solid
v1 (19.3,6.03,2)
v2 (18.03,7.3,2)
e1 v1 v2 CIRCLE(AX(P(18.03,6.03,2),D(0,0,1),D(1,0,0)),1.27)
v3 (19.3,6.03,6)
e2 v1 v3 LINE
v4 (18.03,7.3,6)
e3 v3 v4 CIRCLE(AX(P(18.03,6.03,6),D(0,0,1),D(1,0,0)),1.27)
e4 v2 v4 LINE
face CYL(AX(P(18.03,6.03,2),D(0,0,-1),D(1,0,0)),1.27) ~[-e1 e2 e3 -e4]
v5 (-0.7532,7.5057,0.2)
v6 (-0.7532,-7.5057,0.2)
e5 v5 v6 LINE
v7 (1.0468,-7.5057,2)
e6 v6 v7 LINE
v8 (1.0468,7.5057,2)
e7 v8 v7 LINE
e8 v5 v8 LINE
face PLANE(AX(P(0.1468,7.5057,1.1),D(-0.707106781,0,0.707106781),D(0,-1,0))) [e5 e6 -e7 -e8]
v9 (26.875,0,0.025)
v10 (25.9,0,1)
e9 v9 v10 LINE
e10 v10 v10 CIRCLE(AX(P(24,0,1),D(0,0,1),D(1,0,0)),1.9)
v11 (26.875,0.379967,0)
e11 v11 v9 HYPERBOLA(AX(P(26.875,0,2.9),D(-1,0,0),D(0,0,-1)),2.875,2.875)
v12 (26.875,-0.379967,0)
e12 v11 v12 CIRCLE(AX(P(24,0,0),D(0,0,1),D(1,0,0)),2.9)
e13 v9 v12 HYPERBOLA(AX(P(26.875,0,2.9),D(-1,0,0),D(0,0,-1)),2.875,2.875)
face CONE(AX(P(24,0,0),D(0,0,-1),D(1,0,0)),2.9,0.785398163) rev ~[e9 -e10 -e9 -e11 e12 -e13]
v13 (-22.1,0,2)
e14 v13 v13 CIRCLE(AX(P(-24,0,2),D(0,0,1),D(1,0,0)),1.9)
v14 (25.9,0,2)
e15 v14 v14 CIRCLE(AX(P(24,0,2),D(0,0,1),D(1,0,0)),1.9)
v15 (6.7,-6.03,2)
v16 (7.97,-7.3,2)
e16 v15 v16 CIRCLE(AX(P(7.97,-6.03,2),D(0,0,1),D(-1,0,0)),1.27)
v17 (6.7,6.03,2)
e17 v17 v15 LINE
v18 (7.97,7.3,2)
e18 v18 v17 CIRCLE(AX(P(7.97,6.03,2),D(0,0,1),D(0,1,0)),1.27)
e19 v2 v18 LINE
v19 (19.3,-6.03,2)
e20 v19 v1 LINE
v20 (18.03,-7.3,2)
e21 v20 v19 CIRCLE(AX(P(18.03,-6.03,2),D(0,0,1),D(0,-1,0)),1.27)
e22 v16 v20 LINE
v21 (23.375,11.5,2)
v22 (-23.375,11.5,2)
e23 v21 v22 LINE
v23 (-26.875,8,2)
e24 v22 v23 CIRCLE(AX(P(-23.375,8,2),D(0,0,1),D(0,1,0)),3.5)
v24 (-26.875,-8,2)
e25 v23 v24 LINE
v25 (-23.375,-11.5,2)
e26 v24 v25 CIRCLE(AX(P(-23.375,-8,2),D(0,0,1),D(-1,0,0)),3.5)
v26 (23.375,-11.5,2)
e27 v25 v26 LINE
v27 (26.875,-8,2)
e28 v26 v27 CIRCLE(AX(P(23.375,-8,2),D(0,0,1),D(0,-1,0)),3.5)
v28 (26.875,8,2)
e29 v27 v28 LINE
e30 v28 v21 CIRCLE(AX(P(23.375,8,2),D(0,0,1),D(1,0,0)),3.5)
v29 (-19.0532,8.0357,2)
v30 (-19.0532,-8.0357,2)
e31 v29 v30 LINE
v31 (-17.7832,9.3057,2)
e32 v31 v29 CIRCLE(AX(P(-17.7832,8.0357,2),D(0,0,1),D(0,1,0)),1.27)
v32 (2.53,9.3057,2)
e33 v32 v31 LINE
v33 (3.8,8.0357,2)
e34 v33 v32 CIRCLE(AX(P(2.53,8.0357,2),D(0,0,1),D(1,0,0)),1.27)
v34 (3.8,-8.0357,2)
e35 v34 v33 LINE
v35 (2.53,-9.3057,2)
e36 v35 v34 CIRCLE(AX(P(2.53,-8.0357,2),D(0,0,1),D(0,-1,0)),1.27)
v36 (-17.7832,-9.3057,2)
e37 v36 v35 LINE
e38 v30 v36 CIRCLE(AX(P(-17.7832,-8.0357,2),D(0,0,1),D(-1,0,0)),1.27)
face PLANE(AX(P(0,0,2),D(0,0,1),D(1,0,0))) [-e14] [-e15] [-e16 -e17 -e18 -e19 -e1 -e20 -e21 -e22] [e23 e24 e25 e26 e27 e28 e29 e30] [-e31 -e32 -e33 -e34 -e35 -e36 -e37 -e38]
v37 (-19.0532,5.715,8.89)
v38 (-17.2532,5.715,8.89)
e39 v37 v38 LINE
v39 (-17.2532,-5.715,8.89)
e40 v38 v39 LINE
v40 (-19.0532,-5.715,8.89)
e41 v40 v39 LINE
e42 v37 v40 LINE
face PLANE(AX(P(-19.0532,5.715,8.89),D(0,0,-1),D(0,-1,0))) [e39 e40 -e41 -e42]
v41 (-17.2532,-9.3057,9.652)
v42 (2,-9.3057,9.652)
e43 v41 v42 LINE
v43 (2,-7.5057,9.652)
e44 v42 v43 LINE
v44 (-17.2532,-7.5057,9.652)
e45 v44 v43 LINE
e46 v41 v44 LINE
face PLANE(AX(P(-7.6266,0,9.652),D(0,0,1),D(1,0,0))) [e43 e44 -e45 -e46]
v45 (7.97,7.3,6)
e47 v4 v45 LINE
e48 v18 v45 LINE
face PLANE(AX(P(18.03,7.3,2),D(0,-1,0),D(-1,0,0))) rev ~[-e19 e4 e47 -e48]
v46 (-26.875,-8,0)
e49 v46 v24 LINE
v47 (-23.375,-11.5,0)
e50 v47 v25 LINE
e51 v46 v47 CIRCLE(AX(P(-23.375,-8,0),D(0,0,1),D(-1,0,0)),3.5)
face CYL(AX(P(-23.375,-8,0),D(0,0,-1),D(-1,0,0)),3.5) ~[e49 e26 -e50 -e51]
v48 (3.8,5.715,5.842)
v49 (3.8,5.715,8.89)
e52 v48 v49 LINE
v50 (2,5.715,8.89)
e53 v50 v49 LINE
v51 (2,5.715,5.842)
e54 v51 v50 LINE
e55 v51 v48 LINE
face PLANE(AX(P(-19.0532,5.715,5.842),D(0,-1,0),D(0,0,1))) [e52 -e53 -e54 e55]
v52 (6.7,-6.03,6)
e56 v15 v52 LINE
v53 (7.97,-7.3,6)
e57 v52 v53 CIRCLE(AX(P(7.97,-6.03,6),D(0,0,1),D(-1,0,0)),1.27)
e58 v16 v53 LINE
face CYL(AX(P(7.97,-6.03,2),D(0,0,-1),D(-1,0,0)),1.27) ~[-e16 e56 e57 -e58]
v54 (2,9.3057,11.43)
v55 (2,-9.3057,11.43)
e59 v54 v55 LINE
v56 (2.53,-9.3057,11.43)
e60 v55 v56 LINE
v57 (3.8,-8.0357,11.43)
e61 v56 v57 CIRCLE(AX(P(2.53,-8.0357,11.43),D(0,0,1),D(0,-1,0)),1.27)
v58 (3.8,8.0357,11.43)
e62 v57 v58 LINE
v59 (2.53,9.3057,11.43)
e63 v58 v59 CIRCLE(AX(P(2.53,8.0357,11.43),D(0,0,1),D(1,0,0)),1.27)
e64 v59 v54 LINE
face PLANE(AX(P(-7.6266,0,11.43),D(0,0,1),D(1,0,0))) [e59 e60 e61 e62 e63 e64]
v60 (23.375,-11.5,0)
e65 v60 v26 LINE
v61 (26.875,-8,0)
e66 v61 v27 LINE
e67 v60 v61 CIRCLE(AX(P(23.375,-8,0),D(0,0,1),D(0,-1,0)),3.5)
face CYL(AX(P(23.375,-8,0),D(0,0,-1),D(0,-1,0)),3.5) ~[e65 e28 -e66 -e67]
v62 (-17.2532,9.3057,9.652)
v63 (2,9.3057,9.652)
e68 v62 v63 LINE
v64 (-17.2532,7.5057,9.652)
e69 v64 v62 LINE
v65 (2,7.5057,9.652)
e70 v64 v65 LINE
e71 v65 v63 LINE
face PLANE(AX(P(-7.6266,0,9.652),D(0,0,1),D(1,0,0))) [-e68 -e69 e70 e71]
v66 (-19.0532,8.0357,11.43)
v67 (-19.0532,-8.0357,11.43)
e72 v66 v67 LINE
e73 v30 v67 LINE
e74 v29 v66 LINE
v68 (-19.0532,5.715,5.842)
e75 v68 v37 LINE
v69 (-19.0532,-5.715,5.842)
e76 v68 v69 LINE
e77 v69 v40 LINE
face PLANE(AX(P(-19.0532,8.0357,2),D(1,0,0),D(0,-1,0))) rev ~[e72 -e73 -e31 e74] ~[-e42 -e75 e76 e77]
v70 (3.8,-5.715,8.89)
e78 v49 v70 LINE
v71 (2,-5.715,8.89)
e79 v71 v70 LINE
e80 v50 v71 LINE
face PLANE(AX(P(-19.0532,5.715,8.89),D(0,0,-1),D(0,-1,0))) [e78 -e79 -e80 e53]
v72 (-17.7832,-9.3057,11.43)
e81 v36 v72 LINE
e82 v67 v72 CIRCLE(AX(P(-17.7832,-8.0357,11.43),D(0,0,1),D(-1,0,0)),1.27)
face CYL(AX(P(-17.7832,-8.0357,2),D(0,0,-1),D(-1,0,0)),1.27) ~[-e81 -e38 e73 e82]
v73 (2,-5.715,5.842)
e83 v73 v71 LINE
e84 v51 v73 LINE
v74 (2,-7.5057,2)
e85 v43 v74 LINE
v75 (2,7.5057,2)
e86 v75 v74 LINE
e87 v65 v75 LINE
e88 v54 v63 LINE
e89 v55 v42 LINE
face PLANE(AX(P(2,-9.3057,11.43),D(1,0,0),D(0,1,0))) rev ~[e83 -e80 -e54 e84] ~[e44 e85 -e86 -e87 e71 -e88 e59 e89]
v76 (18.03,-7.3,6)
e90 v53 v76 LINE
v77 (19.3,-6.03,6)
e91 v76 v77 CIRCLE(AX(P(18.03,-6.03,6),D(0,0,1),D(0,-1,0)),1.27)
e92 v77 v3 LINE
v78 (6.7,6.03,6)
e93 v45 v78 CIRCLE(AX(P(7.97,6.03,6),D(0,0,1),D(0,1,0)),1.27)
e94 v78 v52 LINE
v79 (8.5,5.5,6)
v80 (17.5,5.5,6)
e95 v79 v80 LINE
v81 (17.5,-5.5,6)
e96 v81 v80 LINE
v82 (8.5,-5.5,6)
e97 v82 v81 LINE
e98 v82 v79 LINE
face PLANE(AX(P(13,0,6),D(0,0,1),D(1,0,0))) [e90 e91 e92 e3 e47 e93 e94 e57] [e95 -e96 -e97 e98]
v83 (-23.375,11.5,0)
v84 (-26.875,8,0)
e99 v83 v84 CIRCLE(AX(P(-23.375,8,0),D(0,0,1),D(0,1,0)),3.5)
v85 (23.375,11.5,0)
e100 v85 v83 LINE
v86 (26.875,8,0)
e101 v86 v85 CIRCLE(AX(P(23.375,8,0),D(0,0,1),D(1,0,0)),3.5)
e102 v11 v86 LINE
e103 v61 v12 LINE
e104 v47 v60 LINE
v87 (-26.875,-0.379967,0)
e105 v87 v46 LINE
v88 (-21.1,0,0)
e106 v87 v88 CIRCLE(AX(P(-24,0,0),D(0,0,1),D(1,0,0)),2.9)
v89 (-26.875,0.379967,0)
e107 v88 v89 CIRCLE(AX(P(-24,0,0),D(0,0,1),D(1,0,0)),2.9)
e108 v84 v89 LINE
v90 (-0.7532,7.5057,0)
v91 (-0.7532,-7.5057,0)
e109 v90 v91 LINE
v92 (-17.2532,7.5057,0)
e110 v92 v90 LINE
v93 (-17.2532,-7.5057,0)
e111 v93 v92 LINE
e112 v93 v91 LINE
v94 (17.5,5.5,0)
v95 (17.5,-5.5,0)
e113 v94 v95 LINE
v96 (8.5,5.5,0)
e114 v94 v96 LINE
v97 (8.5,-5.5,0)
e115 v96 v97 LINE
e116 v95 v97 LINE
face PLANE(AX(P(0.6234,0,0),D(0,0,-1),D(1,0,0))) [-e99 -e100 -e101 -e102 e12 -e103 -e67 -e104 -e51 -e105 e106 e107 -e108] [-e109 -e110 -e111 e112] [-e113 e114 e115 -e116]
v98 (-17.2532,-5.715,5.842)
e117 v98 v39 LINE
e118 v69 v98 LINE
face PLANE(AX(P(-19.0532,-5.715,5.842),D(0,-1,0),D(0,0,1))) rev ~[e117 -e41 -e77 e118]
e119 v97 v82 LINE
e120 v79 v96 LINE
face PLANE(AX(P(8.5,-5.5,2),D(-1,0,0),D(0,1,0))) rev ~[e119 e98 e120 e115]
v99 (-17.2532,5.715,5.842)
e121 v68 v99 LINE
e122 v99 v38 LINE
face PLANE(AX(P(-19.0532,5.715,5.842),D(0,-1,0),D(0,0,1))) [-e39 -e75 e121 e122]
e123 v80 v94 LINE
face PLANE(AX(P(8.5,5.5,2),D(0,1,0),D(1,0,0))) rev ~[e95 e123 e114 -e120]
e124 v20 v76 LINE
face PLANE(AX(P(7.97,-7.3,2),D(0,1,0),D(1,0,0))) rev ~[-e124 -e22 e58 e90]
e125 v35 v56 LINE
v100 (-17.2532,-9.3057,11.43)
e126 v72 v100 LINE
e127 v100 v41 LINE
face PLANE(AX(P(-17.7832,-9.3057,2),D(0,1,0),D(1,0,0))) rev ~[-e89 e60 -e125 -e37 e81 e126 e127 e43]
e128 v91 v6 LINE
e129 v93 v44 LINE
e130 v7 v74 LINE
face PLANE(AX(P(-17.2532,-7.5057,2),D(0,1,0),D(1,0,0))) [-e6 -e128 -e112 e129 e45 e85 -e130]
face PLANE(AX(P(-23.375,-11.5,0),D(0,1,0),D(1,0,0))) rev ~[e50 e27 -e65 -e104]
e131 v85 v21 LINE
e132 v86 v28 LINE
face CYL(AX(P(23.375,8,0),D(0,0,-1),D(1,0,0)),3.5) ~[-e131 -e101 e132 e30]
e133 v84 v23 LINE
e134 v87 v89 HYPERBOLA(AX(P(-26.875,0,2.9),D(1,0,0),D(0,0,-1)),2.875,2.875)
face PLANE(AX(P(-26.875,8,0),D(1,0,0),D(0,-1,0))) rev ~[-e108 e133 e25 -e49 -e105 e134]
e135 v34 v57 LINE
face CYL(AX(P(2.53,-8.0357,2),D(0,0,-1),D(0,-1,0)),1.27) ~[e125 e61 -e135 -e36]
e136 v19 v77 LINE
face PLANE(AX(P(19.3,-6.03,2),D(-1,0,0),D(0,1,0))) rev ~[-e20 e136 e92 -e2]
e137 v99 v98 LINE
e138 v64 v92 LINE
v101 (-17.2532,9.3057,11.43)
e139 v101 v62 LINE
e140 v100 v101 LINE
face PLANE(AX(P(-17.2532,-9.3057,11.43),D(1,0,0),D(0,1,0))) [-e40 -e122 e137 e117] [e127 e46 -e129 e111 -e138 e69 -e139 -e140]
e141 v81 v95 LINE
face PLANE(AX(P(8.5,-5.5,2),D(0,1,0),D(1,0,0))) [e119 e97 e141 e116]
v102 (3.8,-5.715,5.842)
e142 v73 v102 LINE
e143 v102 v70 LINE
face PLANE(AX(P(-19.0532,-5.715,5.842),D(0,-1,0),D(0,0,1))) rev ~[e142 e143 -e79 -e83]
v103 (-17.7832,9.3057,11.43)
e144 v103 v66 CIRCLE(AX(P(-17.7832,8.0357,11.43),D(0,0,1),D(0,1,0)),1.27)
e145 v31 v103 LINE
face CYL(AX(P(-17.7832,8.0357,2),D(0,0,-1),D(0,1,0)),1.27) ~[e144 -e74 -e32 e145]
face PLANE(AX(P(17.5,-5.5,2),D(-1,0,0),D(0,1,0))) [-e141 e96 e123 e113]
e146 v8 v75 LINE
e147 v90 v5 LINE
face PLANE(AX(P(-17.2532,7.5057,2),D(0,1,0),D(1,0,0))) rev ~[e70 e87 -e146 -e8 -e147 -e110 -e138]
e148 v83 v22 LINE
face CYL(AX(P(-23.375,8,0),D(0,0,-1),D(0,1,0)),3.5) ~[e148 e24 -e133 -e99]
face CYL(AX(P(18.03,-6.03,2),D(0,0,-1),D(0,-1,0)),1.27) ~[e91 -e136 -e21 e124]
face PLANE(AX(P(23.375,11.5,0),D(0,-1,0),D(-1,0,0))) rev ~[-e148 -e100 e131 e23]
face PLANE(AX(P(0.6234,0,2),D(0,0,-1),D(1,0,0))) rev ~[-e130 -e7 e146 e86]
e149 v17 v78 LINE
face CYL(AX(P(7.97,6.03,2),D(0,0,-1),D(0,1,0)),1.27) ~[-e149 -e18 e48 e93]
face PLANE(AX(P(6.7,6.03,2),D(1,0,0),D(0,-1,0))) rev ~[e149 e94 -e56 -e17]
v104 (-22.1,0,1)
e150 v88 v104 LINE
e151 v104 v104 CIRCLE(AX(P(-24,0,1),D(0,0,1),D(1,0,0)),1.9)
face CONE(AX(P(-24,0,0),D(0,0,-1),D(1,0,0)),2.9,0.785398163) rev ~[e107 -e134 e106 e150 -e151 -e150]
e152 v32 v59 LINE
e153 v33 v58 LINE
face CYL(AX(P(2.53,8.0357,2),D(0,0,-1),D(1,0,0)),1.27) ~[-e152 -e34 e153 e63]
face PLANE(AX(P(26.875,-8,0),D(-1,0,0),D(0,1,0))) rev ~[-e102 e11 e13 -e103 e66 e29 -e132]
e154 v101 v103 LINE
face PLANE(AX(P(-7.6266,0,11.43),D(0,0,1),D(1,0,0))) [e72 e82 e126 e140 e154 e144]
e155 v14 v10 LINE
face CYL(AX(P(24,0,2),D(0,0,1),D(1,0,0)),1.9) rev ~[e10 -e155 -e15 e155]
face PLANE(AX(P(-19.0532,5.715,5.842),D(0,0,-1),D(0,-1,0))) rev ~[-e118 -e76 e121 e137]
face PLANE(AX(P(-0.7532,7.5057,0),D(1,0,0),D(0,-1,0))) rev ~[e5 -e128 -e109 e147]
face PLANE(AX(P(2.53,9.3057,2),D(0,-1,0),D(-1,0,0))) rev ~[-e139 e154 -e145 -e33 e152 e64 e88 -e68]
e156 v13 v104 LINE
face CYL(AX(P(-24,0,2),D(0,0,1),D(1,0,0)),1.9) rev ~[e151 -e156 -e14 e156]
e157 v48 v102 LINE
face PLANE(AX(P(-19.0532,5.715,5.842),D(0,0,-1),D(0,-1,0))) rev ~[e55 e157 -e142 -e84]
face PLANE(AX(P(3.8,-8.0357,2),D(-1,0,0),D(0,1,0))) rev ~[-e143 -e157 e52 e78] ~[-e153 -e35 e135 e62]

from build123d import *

# Parameters (mm, degrees)
F1_DEPTH  = 2
F2_R      = 1.9
F3_DEPTH  = 2.001
F5_W      = 19.2532
F5_H      = 15.0114
F6_DEPTH  = 2.001
F7_W      = 19.2532
F7_H      = 15.0114
F8_DEPTH  = 9.43
F9_W      = 11.43
F9_H      = 3.048
F10_DEPTH = 45.9292
F11_W     = 19.2532
F11_H     = 18.6114
F12_DEPTH = 1.778
F13_W     = 2.7532
F13_H     = 15.0114
F14_DEPTH = 2
F15_SIZE  = 1.8
F16_W     = 9
F16_H     = 11
F17_DEPTH = 2.001
F18_W     = 9
F18_H     = 11
F19_DEPTH = 4


# Not quite as in the source:
# - a fillet or chamfer that OpenCascade refuses, or shapes differently, is made with other operations: its cross-section is extruded or revolved along the edge and cut away or added


with BuildPart() as f1:
    # F0 (on Top) → F1 (new body)
    with BuildSketch(Plane.XY):
        with BuildLine():
            ThreePointArc((26.875, 8), (25.8498737342, 10.4748737342), (23.375, 11.5))
            Line((23.375, 11.5), (-23.375, 11.5))
            ThreePointArc((-23.375, 11.5), (-25.8498737342, 10.4748737342), (-26.875, 8))
            Line((-26.875, 8), (-26.875, -8))
            ThreePointArc((-26.875, -8), (-25.8498737342, -10.4748737342), (-23.375, -11.5))
            Line((-23.375, -11.5), (23.375, -11.5))
            ThreePointArc((23.375, -11.5), (25.8498737342, -10.4748737342), (26.875, -8))
            Line((26.875, -8), (26.875, 8))
        make_face()
    extrude(amount=F1_DEPTH)

    # F2 (on face) → F3 (cut, through all)
    with BuildSketch(Plane.XY.offset(2)):
        with Locations((-24, 0)):
            Circle(F2_R)
        with Locations((24, 0)):
            Circle(F2_R)
    extrude(amount=-F3_DEPTH, mode=Mode.SUBTRACT)

    # F4: chamfer of 1 on 2 edges, made by hand

    # F4_s1 → F4_t2 (revolve, cut)
    with BuildSketch(Plane.XZ):
        Polygon((-21.1, 0), (-22.1, 1), (-22.1, 0), align=None)
    revolve(axis=Axis((-24, 0, 0), (0, 0, 1)), mode=Mode.SUBTRACT)

    # F4_s3 → F4_t4 (revolve, cut)
    with BuildSketch(Plane.XZ):
        Polygon((26.9, 0), (25.9, 1), (25.9, 0), align=None)
    revolve(axis=Axis((24, 0, 0), (0, 0, 1)), mode=Mode.SUBTRACT)

    # F5 (on face) → F6 (cut, through all)
    with BuildSketch(Plane.XY.offset(2)):
        with Locations((-7.6266, 0)):
            Rectangle(F5_W, F5_H)
    extrude(amount=-F6_DEPTH, mode=Mode.SUBTRACT)

    # F7 (on face) → F8 (join)
    with BuildSketch(Plane.XY.offset(2)):
        with BuildLine():
            ThreePointArc((3.8, 8.0357), (3.4280256121, 8.9337256121), (2.53, 9.3057))
            Line((2.53, 9.3057), (-17.7832, 9.3057))
            ThreePointArc((-17.7832, 9.3057), (-18.6812256121, 8.9337256121), (-19.0532, 8.0357))
            Line((-19.0532, 8.0357), (-19.0532, -8.0357))
            ThreePointArc((-19.0532, -8.0357), (-18.6812256121, -8.9337256121), (-17.7832, -9.3057))
            Line((-17.7832, -9.3057), (2.53, -9.3057))
            ThreePointArc((2.53, -9.3057), (3.4280256121, -8.9337256121), (3.8, -8.0357))
            Line((3.8, -8.0357), (3.8, 8.0357))
        make_face()
        with Locations((-7.6266, 0)):
            Rectangle(F7_W, F7_H, mode=Mode.SUBTRACT)
    extrude(amount=F8_DEPTH)

    # F9 (on face) → F10 (cut, through all)
    with BuildSketch(Plane(origin=(-19.0532, 0, 0), x_dir=(0, -1, 0), z_dir=(-1, 0, 0))):
        with Locations((0, 7.366)):
            Rectangle(F9_W, F9_H)
    extrude(amount=-F10_DEPTH, mode=Mode.SUBTRACT)

    # F11 (on face) → F12 (cut)
    with BuildSketch(Plane.XY.offset(11.43)):
        with Locations((-7.6266, 0)):
            Rectangle(F11_W, F11_H)
    extrude(amount=-F12_DEPTH, mode=Mode.SUBTRACT)

    # F13 (on face) → F14 (join)
    with BuildSketch(Plane(origin=(0, 0, 0), x_dir=(1, 0, 0), z_dir=(0, 0, -1))):
        with Locations((0.6234, 0)):
            Rectangle(F13_W, F13_H)
    extrude(amount=-F14_DEPTH)

    # F15
    f15_edges = [f1.edges().sort_by_distance(p)[0] for p in [
        (-0.7532, 0, 2),
    ]]
    chamfer(f15_edges, length=F15_SIZE)

    # F16 (on face) → F17 (cut, through all)
    with BuildSketch(Plane.XY.offset(2)):
        with Locations((13, 0)):
            Rectangle(F16_W, F16_H)
    extrude(amount=-F17_DEPTH, mode=Mode.SUBTRACT)

    # F18 (on face) → F19 (join)
    with BuildSketch(Plane.XY.offset(2)):
        with BuildLine():
            ThreePointArc((18.03, -7.3), (18.9280256121, -6.9280256121), (19.3, -6.03))
            Line((19.3, -6.03), (19.3, 6.03))
            ThreePointArc((19.3, 6.03), (18.9280256121, 6.9280256121), (18.03, 7.3))
            Line((18.03, 7.3), (7.97, 7.3))
            ThreePointArc((7.97, 7.3), (7.0719743879, 6.9280256121), (6.7, 6.03))
            Line((6.7, 6.03), (6.7, -6.03))
            ThreePointArc((6.7, -6.03), (7.0719743879, -6.9280256121), (7.97, -7.3))
            Line((7.97, -7.3), (18.03, -7.3))
        make_face()
        with Locations((13, 0)):
            Rectangle(F18_W, F18_H, mode=Mode.SUBTRACT)
    extrude(amount=F19_DEPTH)


solid = f1.part
